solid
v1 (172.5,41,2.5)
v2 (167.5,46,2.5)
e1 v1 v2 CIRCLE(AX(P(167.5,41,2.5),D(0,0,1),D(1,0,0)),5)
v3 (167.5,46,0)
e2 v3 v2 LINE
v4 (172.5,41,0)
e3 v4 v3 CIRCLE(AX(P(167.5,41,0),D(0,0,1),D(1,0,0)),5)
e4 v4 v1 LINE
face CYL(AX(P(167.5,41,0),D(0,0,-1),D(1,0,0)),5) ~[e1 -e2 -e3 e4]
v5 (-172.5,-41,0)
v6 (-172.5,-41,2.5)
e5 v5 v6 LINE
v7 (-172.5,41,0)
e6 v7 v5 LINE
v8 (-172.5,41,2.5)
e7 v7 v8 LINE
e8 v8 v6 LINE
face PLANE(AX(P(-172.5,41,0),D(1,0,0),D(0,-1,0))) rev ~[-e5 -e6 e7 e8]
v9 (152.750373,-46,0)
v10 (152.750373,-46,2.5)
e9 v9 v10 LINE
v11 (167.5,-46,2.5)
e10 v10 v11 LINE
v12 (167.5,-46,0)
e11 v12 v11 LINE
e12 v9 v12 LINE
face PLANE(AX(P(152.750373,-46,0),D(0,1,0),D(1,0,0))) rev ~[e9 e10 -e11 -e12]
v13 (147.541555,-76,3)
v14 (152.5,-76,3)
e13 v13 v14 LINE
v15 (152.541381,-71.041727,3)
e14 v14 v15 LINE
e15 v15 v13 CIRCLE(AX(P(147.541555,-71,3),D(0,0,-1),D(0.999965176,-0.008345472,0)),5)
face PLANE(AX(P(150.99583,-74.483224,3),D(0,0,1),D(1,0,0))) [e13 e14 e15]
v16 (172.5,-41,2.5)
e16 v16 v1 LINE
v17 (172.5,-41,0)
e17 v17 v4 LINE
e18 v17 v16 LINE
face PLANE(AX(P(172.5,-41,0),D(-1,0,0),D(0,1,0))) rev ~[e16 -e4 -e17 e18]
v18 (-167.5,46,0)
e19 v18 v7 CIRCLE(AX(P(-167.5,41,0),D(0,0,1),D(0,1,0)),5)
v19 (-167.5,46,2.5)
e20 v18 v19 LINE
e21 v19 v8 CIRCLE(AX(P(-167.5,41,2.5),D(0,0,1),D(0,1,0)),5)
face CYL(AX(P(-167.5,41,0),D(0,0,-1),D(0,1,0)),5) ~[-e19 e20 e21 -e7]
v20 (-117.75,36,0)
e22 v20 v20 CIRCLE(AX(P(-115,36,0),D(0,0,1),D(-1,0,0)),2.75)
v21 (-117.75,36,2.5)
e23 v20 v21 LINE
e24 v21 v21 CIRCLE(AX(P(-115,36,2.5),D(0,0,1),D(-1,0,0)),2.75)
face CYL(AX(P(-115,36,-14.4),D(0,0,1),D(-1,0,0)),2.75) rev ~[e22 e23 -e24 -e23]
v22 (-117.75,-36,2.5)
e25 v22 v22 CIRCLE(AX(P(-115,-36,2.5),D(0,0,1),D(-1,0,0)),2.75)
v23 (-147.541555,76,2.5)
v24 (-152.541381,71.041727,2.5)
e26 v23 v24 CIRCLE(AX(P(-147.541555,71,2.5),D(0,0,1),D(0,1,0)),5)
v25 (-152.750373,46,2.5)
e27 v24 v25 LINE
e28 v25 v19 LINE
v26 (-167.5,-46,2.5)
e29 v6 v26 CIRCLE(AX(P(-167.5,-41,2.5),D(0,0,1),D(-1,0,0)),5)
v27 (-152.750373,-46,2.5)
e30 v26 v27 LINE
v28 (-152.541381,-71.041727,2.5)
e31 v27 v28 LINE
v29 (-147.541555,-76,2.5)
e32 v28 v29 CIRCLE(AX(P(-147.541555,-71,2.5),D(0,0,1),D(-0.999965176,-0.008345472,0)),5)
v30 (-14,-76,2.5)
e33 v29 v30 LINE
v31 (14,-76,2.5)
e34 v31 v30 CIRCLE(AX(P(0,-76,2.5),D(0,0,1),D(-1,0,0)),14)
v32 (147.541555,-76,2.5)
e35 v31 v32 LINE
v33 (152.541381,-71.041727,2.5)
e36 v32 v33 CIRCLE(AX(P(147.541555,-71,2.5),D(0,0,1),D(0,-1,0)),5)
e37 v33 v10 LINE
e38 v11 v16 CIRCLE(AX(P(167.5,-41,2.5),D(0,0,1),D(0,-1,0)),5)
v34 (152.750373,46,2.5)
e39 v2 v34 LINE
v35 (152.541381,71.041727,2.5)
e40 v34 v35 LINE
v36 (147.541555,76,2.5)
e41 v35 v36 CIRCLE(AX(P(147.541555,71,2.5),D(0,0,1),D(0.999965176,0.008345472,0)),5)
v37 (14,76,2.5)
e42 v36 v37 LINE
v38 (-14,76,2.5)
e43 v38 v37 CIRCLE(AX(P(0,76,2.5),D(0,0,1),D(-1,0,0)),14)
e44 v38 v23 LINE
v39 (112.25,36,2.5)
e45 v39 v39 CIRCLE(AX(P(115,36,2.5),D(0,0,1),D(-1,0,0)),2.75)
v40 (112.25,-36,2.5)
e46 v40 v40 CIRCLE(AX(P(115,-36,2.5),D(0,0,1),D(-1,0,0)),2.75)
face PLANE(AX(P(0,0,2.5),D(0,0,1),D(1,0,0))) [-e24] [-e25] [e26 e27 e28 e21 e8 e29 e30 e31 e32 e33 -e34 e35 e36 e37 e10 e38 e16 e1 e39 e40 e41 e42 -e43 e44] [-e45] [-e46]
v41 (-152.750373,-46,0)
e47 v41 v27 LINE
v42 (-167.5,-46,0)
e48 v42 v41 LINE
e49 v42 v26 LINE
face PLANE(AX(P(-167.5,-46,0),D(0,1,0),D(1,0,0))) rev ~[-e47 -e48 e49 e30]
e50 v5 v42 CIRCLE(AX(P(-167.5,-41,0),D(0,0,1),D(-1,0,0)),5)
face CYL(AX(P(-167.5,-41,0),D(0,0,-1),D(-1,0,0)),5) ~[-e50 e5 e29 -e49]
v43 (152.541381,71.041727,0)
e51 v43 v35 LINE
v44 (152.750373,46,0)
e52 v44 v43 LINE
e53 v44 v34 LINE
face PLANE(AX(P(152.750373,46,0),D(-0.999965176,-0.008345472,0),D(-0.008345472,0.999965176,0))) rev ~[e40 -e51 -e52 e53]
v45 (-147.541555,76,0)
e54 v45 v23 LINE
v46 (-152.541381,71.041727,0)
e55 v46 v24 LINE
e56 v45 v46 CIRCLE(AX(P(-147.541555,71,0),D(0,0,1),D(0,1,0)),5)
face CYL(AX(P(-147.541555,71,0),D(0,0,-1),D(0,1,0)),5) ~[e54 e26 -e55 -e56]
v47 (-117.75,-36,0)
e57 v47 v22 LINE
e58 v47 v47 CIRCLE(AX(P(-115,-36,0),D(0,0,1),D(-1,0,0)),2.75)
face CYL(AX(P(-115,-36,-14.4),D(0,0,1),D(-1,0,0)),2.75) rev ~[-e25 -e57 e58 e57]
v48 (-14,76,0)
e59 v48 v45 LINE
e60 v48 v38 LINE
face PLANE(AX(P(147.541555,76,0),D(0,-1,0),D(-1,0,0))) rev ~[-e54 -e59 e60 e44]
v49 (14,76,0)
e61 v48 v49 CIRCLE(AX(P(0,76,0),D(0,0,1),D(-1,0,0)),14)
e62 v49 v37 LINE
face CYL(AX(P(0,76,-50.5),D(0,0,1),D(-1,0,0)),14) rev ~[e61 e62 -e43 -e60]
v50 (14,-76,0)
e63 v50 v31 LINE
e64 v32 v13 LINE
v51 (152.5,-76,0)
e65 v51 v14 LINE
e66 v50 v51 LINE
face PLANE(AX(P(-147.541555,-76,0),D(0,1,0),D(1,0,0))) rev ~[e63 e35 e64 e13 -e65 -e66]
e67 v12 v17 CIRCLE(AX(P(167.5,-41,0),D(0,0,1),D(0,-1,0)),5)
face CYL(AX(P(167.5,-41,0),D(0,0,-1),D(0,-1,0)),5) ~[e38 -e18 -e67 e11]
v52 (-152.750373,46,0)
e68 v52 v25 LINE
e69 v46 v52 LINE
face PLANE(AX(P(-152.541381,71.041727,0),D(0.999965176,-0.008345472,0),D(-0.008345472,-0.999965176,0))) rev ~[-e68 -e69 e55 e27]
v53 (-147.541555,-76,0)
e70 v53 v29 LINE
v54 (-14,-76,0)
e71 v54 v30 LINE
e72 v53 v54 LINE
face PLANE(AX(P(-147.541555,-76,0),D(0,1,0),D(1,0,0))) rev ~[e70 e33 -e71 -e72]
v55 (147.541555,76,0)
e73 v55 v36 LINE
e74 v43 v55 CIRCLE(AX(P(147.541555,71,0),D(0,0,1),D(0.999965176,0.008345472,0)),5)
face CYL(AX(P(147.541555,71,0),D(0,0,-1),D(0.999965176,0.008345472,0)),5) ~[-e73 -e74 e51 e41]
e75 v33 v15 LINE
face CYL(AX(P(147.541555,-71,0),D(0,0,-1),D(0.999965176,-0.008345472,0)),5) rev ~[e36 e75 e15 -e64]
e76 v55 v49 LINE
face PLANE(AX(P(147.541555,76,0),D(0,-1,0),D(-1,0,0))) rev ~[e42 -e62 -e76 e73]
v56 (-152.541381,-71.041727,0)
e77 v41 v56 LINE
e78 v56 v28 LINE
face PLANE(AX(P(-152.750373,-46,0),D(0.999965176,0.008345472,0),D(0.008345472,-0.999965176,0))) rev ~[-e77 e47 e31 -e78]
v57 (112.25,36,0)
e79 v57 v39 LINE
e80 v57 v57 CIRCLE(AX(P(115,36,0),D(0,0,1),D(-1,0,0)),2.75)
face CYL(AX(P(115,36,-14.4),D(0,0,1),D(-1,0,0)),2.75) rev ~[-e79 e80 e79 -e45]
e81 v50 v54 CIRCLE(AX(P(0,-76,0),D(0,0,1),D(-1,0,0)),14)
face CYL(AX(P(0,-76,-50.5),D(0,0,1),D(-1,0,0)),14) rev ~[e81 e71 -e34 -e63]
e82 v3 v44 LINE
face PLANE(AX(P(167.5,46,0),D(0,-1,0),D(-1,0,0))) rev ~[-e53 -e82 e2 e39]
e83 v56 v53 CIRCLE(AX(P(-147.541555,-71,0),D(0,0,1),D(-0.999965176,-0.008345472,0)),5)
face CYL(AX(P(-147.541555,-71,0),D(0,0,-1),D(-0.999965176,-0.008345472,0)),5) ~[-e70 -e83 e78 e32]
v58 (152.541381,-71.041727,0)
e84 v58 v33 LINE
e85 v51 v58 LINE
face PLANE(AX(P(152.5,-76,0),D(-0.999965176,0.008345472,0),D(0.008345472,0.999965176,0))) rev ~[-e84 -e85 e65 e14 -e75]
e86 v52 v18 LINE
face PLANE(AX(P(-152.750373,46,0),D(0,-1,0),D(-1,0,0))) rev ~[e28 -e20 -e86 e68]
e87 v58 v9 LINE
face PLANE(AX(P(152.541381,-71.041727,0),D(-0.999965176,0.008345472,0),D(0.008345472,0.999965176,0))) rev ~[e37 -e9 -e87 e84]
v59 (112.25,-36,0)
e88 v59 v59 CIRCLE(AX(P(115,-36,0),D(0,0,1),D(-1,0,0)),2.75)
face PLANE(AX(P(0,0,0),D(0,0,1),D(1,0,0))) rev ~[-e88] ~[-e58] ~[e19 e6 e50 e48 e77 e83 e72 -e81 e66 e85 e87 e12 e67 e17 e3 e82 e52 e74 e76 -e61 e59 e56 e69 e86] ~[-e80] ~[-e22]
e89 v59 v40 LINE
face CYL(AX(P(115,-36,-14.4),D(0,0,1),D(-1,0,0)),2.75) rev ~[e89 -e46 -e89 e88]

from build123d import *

# Parameters (mm, degrees)
F1_DEPTH = 3
F2_DEPTH = 2.5
F3_D     = 28
F3_DEPTH = 50.5
F3_TIP   = 8.4120486664
F4_D     = 28
F4_DEPTH = 50.5
F4_TIP   = 8.4120486664
F5_D     = 5.5
F5_DEPTH = 14.4
F5_TIP   = 1.6523667023


with BuildPart() as f1:
    # F0 (on Top) → F1 (new body)
    with BuildSketch(Plane.XY):
        with BuildLine():
            ThreePointArc((152.5413805678, -71.0417273613), (151.062304835, -74.5502561039), (147.5415546881, -76))
            Line((147.5415546881, -76), (152.5, -76))
            Line((152.5, -76), (152.5413805678, -71.0417273613))
        make_face()
    extrude(amount=F1_DEPTH)

    # F0 (on Top) → F2 (join)
    with BuildSketch(Plane.XY):
        with BuildLine():
            ThreePointArc((-152.5413805678, -71.0417273613), (-151.062304835, -74.5502561039), (-147.5415546881, -76))
            Line((-147.5415546881, -76), (147.5415546881, -76))
            ThreePointArc((147.5415546881, -76), (151.062304835, -74.5502561039), (152.5413805678, -71.0417273613))
            Line((152.5413805678, -71.0417273613), (152.7503728867, -46))
            Line((152.7503728867, -46), (167.5, -46))
            ThreePointArc((167.5, -46), (171.0355339059, -44.5355339059), (172.5, -41))
            Line((172.5, -41), (172.5, 41))
            ThreePointArc((172.5, 41), (171.0355339059, 44.5355339059), (167.5, 46))
            Line((167.5, 46), (152.7503728867, 46))
            Line((152.7503728867, 46), (152.5413805678, 71.0417273613))
            ThreePointArc((152.5413805678, 71.0417273613), (151.062304835, 74.5502561039), (147.5415546881, 76))
            Line((147.5415546881, 76), (-147.5415546881, 76))
            ThreePointArc((-147.5415546881, 76), (-151.062304835, 74.5502561039), (-152.5413805678, 71.0417273613))
            Line((-152.5413805678, 71.0417273613), (-152.7503728867, 46))
            Line((-152.7503728867, 46), (-167.5, 46))
            ThreePointArc((-167.5, 46), (-171.0355339059, 44.5355339059), (-172.5, 41))
            Line((-172.5, 41), (-172.5, -41))
            ThreePointArc((-172.5, -41), (-171.0355339059, -44.5355339059), (-167.5, -46))
            Line((-167.5, -46), (-152.7503728867, -46))
            Line((-152.7503728867, -46), (-152.5413805678, -71.0417273613))
        make_face()
    extrude(amount=F2_DEPTH)

    # F3
    with Locations(Plane(origin=(0, 0, 0), x_dir=(1, 0, 0), z_dir=(0, 0, -1))):
        with Locations((0, -76)):
            Hole(F3_D / 2, depth=F3_DEPTH)
            with Locations((0, 0, -(F3_DEPTH + F3_TIP / 2))):  # 118° drill point
                Cone(0, F3_D / 2, F3_TIP, mode=Mode.SUBTRACT)

    # F4
    with Locations(Plane(origin=(0, 0, 0), x_dir=(1, 0, 0), z_dir=(0, 0, -1))):
        with Locations((0, 76)):
            Hole(F4_D / 2, depth=F4_DEPTH)
            with Locations((0, 0, -(F4_DEPTH + F4_TIP / 2))):  # 118° drill point
                Cone(0, F4_D / 2, F4_TIP, mode=Mode.SUBTRACT)

    # F5
    with Locations(Plane(origin=(0, 0, 0), x_dir=(1, 0, 0), z_dir=(0, 0, -1))):
        with Locations((-115, 36), (-115, -36), (115, -36), (115, 36)):
            Hole(F5_D / 2, depth=F5_DEPTH)
            with Locations((0, 0, -(F5_DEPTH + F5_TIP / 2))):  # 118° drill point
                Cone(0, F5_D / 2, F5_TIP, mode=Mode.SUBTRACT)


solid = f1.part
